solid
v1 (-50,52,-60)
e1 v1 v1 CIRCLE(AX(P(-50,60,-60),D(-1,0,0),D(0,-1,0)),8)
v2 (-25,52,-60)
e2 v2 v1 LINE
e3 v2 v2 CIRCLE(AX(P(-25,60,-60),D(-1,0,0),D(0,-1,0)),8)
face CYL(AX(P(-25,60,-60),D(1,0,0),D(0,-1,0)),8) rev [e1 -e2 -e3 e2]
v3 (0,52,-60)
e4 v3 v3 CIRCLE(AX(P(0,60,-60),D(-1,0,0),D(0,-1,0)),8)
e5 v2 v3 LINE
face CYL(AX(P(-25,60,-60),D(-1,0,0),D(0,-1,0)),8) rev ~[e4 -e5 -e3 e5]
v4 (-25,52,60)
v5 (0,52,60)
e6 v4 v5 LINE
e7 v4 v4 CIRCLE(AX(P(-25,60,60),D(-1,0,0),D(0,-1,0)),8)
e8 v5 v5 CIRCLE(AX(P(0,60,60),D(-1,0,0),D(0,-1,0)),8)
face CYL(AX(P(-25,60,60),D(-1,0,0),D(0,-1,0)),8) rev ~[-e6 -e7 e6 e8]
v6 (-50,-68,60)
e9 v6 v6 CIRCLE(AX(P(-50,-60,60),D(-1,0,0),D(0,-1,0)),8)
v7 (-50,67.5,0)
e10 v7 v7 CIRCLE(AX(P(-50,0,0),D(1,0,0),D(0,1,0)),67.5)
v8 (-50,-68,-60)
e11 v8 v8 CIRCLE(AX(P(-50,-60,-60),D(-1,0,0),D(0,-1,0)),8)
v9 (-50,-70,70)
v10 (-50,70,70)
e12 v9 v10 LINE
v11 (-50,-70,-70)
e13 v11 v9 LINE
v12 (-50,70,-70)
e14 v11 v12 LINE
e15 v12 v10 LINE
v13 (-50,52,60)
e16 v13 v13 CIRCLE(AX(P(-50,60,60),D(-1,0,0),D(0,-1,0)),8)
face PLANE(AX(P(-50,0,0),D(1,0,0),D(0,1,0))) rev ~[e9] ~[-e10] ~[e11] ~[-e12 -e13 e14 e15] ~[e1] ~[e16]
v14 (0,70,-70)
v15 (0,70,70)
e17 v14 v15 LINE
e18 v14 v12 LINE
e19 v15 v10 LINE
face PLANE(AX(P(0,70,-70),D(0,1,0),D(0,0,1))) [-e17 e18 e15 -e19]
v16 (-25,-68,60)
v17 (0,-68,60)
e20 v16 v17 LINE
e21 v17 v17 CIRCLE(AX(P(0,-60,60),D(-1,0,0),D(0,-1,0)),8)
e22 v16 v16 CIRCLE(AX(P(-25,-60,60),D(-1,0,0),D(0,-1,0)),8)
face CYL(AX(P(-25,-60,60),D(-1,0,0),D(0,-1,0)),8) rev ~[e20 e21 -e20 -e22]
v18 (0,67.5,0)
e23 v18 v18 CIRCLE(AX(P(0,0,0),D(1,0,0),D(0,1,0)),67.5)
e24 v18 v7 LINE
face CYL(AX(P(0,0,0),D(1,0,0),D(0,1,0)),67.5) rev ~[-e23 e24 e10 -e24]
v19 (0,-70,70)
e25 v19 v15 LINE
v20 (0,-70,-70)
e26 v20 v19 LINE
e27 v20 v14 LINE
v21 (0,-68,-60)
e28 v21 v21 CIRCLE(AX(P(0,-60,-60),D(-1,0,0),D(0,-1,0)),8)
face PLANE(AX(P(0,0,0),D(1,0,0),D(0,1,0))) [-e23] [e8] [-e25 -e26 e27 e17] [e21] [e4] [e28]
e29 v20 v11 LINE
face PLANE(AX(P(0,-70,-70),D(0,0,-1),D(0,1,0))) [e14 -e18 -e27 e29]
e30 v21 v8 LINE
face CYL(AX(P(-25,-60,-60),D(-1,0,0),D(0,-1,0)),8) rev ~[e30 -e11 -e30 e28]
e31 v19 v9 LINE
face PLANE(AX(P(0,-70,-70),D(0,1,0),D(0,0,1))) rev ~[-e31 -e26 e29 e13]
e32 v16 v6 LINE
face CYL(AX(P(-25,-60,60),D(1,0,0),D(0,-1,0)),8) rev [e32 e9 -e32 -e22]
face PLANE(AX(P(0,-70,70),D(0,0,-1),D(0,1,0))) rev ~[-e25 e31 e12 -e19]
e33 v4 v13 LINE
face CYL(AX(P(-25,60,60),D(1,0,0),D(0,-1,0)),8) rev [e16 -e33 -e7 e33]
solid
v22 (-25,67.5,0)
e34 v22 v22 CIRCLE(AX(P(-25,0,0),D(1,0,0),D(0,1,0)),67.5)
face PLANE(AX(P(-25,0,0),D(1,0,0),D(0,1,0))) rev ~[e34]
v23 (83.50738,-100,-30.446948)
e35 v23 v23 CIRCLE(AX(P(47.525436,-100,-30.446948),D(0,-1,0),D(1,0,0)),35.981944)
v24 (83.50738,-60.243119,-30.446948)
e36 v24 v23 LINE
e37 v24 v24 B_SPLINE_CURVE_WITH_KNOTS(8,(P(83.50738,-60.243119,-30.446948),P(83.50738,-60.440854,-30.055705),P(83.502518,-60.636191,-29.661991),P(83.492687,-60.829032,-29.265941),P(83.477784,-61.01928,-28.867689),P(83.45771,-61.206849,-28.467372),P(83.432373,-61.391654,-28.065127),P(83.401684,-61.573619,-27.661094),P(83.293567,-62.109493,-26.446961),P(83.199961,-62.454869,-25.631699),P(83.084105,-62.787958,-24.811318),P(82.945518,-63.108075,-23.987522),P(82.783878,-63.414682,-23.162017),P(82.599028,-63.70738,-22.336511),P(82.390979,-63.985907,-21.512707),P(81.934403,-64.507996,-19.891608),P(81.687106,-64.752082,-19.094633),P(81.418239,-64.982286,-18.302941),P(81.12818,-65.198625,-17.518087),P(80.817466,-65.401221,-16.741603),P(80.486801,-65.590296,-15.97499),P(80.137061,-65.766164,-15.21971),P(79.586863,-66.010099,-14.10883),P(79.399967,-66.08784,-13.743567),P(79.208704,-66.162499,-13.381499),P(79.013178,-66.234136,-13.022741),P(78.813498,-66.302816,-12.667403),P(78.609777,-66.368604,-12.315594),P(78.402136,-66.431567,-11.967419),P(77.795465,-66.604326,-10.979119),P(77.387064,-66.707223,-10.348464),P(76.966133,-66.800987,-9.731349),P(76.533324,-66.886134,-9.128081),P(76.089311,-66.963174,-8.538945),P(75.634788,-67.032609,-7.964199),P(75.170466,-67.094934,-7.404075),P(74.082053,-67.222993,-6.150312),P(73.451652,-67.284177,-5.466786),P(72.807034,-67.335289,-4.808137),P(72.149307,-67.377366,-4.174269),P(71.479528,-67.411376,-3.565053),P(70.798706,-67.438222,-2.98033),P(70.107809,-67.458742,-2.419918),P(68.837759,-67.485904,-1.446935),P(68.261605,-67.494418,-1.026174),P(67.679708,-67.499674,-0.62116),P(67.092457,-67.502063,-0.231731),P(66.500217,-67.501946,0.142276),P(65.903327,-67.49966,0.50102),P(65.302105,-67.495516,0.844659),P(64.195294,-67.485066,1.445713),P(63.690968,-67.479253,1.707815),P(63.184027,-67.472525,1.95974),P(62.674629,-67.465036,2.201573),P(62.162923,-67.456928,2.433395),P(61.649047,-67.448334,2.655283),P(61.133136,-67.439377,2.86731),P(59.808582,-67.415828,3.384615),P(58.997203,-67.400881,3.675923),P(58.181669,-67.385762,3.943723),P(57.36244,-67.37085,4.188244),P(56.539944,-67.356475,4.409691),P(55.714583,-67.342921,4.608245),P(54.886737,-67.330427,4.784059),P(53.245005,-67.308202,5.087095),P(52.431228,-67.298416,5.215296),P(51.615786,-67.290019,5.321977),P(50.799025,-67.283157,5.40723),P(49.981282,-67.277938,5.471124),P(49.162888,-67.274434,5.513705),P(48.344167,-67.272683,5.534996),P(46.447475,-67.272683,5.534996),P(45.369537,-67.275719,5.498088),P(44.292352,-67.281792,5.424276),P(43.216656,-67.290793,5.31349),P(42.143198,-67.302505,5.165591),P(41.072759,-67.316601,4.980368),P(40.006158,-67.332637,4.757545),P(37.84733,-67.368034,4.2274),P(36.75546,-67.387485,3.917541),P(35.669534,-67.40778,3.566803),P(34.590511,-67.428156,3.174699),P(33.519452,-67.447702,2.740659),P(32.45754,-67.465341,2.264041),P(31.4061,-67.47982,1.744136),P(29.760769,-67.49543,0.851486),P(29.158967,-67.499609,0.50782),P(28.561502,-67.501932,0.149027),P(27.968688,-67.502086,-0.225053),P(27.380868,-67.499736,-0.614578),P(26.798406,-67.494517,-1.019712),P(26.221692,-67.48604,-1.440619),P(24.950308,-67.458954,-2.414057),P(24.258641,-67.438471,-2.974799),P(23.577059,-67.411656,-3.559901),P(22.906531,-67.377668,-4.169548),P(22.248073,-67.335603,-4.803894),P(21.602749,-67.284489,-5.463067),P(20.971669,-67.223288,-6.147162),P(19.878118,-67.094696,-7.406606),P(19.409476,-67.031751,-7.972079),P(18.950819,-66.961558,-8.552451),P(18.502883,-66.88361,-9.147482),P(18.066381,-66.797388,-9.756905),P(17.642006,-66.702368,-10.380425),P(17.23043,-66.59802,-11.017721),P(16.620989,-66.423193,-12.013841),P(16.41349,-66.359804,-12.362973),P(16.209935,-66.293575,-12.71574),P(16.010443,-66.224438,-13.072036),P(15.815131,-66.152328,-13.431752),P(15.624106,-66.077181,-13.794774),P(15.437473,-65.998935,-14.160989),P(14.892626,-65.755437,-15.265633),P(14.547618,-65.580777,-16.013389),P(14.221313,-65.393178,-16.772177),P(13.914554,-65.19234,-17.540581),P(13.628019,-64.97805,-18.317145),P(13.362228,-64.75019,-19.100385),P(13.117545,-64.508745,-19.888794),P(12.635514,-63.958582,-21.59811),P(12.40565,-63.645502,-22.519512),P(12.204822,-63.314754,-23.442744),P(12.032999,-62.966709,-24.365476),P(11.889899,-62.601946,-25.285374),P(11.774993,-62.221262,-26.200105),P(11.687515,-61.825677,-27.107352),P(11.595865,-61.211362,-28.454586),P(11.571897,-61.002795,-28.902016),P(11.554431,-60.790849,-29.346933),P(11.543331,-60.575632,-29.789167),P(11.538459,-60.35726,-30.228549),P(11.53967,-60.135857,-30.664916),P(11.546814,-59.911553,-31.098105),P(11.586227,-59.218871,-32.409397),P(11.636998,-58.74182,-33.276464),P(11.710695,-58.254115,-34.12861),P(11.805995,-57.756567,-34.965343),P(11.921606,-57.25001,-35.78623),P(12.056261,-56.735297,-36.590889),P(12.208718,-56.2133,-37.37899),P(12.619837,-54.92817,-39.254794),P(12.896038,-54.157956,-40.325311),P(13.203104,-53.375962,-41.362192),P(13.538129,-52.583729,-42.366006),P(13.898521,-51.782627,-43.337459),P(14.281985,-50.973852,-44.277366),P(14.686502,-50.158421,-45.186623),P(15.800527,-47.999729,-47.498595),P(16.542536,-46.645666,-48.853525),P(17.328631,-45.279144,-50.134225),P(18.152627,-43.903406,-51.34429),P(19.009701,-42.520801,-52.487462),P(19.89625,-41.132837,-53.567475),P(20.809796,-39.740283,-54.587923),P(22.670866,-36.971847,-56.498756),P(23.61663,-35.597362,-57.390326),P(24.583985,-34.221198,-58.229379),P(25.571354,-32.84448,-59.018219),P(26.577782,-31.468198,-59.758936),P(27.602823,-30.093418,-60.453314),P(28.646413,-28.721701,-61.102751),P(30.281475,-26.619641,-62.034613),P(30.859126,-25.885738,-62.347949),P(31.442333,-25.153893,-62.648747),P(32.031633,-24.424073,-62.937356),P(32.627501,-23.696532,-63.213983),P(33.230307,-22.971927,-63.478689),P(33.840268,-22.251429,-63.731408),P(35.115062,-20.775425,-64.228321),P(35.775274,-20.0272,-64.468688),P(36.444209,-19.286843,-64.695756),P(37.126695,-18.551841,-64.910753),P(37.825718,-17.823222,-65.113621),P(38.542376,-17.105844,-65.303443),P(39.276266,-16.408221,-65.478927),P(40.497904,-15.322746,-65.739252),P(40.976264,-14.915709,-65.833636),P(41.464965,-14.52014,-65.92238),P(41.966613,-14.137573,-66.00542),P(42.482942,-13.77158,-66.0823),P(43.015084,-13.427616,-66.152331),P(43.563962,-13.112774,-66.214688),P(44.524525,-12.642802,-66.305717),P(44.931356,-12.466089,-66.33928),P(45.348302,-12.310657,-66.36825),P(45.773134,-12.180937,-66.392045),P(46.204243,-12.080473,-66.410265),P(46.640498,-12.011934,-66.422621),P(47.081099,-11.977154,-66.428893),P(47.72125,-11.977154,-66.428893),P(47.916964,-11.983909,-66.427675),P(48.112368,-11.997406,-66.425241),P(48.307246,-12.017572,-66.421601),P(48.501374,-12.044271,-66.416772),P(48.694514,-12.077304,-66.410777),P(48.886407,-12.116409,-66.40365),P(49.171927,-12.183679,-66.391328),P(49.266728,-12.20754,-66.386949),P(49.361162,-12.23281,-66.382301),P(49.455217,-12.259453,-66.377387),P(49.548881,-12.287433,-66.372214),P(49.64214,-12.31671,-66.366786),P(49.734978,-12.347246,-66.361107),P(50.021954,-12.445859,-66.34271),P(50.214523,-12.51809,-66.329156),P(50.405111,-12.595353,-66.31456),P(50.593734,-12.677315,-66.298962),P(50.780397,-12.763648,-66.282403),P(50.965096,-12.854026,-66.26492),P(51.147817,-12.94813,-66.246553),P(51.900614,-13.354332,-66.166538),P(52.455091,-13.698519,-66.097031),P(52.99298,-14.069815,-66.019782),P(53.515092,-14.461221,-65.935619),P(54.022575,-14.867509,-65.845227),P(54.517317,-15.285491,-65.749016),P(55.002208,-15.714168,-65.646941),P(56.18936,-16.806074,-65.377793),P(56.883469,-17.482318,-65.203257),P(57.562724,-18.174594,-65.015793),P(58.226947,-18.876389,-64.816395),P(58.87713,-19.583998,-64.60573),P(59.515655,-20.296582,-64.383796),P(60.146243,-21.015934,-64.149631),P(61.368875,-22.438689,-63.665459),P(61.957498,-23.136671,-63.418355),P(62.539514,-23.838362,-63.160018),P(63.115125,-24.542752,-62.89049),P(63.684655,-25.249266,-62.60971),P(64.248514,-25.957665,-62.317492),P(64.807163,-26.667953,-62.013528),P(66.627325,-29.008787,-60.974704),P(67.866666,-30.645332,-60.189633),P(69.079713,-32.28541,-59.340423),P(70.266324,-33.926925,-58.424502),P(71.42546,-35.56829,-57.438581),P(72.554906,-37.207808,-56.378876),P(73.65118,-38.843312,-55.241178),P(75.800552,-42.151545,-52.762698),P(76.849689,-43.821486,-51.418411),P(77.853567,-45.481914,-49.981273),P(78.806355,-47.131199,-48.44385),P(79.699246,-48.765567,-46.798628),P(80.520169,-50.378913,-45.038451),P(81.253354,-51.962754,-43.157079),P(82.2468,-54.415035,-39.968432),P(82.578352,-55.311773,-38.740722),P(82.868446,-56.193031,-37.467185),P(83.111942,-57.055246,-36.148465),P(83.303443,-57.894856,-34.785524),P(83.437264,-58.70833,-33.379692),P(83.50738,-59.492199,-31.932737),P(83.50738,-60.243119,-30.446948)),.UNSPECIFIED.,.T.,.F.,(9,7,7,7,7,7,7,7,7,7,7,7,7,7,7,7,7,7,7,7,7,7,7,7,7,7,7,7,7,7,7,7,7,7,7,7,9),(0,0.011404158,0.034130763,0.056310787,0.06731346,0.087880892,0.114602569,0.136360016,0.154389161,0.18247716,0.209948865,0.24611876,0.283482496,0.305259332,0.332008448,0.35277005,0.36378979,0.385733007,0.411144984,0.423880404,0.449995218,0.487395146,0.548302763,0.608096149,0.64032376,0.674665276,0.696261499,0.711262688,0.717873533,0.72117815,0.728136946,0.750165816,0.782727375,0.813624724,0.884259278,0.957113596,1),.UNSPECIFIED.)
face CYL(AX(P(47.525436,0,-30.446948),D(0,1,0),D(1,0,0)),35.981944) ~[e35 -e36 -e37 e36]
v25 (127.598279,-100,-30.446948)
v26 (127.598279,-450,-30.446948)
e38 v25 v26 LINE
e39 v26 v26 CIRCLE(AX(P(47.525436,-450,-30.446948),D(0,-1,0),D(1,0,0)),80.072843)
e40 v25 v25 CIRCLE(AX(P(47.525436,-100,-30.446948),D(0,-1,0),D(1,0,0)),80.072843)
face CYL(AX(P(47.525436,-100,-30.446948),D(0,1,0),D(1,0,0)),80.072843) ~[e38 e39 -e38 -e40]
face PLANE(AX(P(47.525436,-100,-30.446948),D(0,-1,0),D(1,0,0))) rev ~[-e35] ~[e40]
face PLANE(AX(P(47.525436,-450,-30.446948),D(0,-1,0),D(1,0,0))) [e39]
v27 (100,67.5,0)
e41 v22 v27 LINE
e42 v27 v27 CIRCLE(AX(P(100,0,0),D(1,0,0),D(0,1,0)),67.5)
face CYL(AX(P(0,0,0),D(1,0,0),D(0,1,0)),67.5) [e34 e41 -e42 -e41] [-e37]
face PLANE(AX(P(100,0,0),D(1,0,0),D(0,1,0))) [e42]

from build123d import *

# Parameters (mm, degrees)
F0_W          = 140
F0_H          = 140
F0_R          = 67.5
F1_DEPTH      = 50
F2_R          = 67.5
F3_DEPTH      = 100
F3_DEPTH_BACK = 25
F4_R          = 8
F5_DEPTH      = 25
F6_R          = 35.981944186
F7_DEPTH      = 100
F8_R          = 80.0728434977
F8_R_2        = 35.981944186
F9_DEPTH      = 350


with BuildPart() as f1:
    # F0 (on Right) → F1 (new body)
    with BuildSketch(Plane.YZ):
        Rectangle(F0_W, F0_H)
        Circle(F0_R, mode=Mode.SUBTRACT)
    extrude(amount=-F1_DEPTH)

    # F4 (on face) → F5 (cut, symmetric)
    with BuildSketch(Plane(origin=(-25, 0, 0), x_dir=(0, -1, 0), z_dir=(-1, 0, 0))):
        with Locations((60, 60)):
            Circle(F4_R)
        with Locations((-60, 60)):
            Circle(F4_R)
        with Locations((-60, -60)):
            Circle(F4_R)
        with Locations((60, -60)):
            Circle(F4_R)
    extrude(amount=F5_DEPTH, both=True, mode=Mode.SUBTRACT)


with BuildPart() as f3:
    # F2 (on face) → F3 (new body, two sides)
    with BuildSketch(Plane.YZ) as f3_sk:
        Circle(F2_R)
    extrude(amount=F3_DEPTH)
    extrude(f3_sk.sketch, amount=-F3_DEPTH_BACK)

    # F6 (on Front) → F7 (join)
    with BuildSketch(Plane.XZ):
        with Locations((47.5254356861, -30.4469484836)):
            Circle(F6_R)
    extrude(amount=F7_DEPTH)

    # F8 (on face) → F9 (join)
    with BuildSketch(Plane.XZ.offset(100)):
        with Locations((47.5254356861, -30.4469484836)):
            Circle(F8_R)
        with Locations((47.5254356861, -30.4469484836)):
            Circle(F8_R_2, mode=Mode.SUBTRACT)
        with Locations((47.5254356861, -30.4469484836)):
            Circle(F8_R_2)
    extrude(amount=F9_DEPTH)


solid = Compound([f1.part, f3.part])
